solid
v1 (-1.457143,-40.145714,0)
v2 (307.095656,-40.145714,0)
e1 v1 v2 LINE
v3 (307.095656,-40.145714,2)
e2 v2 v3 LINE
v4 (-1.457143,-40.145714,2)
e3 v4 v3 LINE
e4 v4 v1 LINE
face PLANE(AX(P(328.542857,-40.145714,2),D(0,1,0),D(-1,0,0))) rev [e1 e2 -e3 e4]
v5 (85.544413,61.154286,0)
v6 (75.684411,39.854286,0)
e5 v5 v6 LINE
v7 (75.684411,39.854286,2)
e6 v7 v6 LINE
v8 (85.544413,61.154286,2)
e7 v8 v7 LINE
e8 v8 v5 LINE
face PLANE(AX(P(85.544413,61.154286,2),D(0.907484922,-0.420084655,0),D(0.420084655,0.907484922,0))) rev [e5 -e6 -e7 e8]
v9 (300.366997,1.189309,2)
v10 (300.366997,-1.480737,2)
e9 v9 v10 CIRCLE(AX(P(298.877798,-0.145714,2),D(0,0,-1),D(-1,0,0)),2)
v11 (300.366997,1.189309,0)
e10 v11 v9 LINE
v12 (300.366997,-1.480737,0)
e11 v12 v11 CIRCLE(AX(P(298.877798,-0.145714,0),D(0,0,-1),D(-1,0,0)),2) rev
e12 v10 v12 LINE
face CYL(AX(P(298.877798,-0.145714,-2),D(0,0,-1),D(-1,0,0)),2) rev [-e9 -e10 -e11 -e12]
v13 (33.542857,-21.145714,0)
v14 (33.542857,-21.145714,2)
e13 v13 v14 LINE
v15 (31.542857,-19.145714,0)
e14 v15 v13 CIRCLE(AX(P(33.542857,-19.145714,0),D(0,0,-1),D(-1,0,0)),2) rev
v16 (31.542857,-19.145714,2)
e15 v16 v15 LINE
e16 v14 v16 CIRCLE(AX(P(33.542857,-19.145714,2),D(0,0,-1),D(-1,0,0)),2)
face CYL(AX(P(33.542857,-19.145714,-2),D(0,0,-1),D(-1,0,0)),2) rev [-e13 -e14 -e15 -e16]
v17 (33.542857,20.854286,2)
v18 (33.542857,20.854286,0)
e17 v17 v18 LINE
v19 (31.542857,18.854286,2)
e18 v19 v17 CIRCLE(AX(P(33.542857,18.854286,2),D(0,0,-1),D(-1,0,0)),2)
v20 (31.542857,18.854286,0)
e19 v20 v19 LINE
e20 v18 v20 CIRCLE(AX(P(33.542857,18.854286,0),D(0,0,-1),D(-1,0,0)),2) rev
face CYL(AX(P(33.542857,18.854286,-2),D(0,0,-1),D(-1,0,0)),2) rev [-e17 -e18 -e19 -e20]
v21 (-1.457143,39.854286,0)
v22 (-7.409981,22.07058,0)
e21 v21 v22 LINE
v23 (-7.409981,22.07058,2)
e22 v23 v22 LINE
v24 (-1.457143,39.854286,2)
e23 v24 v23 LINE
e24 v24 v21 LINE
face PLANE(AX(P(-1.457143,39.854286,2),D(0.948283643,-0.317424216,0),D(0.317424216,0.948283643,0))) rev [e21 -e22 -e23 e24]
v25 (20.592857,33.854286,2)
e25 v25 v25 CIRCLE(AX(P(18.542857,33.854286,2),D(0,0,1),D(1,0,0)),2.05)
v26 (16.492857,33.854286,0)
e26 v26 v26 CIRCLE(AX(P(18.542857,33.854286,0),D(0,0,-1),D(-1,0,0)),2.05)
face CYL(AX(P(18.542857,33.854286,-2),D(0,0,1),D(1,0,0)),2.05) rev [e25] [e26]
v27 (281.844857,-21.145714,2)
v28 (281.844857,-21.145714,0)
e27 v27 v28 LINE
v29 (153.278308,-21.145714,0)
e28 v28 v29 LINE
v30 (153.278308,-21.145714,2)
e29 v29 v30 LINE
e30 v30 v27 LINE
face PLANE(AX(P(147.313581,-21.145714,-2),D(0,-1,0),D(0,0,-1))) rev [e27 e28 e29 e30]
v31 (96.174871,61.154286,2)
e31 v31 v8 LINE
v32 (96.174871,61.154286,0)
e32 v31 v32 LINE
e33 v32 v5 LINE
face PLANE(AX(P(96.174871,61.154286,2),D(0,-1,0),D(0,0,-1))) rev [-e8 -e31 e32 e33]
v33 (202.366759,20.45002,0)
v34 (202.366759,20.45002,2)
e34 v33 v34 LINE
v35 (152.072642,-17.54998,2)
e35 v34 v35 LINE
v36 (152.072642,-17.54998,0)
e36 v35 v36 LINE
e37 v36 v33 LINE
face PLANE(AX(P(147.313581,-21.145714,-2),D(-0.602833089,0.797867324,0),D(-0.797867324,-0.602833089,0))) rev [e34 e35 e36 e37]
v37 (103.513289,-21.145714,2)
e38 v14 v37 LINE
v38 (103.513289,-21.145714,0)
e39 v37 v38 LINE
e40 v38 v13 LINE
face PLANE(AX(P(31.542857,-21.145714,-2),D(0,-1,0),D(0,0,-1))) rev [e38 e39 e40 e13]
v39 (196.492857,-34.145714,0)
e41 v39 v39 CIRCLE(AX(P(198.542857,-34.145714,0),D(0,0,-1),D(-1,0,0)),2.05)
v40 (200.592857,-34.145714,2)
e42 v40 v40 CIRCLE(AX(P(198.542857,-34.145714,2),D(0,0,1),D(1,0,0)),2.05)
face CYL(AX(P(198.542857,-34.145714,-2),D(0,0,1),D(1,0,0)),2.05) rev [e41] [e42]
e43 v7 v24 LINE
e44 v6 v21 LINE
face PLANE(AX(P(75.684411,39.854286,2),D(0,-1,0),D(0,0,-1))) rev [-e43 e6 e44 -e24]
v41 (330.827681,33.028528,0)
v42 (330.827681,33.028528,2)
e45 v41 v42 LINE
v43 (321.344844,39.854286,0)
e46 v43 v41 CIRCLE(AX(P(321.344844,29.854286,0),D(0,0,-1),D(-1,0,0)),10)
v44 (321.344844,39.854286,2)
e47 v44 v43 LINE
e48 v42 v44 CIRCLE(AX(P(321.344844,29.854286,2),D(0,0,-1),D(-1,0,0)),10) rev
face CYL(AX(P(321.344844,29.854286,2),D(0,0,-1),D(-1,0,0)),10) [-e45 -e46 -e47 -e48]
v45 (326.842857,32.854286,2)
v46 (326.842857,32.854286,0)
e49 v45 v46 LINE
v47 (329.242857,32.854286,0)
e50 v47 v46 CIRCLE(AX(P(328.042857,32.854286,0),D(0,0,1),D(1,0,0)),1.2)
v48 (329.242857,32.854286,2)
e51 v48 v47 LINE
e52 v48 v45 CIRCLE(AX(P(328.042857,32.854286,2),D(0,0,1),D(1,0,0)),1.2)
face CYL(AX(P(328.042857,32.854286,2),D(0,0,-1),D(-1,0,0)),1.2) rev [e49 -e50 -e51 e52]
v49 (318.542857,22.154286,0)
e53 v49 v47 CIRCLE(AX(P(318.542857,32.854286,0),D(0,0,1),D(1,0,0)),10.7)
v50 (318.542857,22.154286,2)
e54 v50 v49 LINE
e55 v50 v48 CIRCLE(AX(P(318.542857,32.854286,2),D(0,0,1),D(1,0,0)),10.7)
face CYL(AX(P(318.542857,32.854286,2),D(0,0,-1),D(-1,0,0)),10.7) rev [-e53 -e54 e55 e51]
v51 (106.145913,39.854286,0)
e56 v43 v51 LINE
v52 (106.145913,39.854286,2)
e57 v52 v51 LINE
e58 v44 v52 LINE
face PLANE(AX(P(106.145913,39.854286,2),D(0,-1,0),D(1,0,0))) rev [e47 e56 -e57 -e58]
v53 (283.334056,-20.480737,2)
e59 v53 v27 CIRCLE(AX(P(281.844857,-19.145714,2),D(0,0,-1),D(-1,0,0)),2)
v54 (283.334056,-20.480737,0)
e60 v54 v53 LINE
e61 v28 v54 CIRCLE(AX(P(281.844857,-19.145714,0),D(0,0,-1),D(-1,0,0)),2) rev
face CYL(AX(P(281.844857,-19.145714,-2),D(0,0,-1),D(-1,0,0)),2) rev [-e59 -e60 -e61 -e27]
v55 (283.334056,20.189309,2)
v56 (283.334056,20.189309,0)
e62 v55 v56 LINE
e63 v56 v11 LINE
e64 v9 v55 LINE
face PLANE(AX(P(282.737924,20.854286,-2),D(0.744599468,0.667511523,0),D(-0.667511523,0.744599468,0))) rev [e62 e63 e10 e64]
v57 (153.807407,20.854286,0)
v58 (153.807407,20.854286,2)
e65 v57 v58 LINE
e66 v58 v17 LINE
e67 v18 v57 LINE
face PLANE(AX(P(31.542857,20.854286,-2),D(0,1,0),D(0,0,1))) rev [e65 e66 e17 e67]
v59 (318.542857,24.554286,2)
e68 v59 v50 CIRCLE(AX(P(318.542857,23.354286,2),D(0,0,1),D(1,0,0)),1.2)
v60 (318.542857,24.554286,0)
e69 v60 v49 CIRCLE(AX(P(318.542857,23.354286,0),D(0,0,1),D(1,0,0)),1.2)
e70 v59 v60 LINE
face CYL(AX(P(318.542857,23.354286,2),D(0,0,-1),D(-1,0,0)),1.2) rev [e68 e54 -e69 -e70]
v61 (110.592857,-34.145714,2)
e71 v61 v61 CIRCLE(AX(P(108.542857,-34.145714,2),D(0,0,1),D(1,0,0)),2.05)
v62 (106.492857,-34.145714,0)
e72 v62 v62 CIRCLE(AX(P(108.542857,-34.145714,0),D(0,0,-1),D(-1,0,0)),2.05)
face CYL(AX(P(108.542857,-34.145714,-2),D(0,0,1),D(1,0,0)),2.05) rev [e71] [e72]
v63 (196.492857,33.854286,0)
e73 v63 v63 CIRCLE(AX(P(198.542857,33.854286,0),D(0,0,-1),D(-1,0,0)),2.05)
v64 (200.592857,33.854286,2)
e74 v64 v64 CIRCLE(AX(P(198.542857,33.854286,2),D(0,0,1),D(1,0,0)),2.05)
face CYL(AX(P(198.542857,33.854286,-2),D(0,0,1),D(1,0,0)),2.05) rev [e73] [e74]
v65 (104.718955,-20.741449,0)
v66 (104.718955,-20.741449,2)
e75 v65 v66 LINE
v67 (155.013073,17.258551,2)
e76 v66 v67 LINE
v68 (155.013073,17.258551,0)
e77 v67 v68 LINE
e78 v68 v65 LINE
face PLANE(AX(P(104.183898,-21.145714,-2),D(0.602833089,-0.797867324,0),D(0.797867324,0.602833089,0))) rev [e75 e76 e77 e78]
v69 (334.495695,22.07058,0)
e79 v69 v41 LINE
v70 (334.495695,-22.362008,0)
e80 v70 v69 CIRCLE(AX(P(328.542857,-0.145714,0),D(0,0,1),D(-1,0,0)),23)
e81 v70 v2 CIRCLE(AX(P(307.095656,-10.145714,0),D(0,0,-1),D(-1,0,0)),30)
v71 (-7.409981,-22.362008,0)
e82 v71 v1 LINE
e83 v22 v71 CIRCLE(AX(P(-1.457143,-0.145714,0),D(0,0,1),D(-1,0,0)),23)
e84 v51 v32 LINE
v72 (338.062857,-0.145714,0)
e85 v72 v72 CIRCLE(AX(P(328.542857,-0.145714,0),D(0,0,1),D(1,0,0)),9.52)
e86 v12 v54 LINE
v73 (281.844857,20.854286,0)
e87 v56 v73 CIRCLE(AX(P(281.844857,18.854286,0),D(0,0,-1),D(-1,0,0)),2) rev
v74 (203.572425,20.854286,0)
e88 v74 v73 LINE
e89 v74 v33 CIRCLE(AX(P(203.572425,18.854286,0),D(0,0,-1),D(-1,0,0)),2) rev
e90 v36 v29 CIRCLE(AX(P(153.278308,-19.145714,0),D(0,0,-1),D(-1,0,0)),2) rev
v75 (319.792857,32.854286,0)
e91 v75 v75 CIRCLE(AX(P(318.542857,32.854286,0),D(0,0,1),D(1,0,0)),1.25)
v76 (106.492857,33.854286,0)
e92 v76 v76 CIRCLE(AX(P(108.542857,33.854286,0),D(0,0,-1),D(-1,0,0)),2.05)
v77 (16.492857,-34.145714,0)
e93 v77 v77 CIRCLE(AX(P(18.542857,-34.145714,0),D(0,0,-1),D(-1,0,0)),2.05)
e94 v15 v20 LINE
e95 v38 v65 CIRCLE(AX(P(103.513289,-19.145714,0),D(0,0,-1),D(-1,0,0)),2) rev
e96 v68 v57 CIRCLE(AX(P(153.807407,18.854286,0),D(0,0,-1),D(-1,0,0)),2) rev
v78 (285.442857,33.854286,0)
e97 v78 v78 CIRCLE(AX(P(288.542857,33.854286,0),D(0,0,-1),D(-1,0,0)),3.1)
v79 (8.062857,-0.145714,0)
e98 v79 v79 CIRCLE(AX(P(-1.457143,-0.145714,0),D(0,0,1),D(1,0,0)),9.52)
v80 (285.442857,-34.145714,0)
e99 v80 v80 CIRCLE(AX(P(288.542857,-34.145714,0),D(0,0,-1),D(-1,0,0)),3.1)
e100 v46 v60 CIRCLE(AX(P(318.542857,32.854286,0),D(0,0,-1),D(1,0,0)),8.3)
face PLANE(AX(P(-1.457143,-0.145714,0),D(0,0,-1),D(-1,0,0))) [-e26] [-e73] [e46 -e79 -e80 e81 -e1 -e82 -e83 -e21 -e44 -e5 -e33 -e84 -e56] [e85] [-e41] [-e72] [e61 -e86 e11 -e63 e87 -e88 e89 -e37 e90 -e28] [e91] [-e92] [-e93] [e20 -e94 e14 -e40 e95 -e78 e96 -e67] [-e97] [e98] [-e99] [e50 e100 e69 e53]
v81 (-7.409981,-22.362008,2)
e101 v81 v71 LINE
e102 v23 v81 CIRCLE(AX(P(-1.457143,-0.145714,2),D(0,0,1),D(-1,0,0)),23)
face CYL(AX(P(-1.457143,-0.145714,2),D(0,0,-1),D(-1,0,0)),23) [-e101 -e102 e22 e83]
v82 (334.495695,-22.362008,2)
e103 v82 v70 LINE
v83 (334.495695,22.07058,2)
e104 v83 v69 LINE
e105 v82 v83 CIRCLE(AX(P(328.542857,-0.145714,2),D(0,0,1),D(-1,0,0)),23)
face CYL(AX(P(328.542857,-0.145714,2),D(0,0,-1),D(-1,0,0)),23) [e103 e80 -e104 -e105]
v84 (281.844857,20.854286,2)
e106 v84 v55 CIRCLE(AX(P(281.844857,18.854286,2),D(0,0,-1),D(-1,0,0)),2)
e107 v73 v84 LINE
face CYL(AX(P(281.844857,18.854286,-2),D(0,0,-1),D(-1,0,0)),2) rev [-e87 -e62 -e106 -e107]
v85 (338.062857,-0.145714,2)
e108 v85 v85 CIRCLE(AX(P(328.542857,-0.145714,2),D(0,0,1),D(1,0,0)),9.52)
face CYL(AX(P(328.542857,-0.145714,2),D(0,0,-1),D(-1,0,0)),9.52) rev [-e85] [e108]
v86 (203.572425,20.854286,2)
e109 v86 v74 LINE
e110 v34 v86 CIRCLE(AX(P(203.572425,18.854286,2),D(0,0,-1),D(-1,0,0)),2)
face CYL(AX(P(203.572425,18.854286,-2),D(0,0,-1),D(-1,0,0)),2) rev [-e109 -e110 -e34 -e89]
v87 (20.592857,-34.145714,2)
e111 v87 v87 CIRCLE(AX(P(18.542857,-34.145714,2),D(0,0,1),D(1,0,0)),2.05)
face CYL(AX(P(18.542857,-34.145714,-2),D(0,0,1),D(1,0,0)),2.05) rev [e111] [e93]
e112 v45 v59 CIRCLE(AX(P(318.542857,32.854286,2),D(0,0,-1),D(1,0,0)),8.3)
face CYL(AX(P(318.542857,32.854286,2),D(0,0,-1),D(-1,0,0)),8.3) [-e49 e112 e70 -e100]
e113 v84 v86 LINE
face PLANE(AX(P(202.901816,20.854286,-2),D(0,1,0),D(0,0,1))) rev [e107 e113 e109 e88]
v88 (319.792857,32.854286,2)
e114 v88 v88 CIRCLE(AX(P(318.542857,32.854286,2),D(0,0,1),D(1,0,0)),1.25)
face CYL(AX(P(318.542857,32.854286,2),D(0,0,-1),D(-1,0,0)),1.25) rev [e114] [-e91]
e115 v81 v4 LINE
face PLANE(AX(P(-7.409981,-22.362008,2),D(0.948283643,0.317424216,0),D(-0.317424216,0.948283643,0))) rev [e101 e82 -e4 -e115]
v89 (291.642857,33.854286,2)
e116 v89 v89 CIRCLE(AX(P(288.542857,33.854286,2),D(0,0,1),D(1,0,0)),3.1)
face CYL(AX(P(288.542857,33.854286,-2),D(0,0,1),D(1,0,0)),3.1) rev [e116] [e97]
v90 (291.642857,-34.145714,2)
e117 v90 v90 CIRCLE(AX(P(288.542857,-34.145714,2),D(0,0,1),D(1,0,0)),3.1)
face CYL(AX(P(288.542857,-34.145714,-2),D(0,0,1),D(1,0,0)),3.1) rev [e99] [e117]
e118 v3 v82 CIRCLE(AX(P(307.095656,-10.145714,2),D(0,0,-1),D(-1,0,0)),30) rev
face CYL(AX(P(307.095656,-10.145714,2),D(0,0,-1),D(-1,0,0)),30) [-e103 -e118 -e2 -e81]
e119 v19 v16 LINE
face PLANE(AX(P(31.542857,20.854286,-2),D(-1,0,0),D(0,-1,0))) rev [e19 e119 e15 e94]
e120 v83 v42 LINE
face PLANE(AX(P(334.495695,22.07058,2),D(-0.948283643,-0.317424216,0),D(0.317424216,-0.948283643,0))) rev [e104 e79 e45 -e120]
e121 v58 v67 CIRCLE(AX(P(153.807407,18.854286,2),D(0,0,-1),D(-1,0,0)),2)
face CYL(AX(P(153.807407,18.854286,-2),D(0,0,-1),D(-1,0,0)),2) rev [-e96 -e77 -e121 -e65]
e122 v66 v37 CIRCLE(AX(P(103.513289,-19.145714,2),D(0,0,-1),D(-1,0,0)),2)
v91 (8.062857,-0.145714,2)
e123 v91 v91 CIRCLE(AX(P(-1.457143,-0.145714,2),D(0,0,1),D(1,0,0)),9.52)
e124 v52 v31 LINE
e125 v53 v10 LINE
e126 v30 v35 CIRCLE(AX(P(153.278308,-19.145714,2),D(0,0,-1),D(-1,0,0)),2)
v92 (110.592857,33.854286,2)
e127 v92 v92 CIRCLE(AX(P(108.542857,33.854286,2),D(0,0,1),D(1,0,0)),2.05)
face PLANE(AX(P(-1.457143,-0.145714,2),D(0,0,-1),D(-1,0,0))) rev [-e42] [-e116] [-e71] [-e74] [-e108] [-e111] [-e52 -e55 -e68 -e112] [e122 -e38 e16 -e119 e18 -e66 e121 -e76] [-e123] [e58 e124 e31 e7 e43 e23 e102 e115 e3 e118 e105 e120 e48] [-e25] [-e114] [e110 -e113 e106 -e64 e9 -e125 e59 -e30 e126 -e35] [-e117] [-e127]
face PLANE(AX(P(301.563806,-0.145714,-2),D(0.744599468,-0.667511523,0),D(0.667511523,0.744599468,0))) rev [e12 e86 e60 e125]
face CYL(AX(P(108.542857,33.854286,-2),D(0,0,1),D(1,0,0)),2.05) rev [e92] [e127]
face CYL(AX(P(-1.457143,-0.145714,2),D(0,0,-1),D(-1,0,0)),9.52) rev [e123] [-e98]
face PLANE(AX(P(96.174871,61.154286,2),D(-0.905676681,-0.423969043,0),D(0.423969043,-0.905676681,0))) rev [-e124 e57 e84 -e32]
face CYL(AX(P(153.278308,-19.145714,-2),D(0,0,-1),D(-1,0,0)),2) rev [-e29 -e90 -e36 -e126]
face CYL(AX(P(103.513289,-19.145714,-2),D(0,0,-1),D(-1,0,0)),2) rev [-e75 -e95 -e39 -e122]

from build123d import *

# Parameters (mm, degrees)
SKETCH_1_R          = 9.52
SKETCH_1_R_2        = 1.25
EXTRUDE_1_DEPTH     = 2
SKETCH_2_R          = 2.05
SKETCH_2_R_2        = 3.1
CUT_EXTRUDE_1_DEPTH = 4
FILLET_1_R          = 2
FILLET_3_R          = 30
FILLET_6_R          = 10


with BuildPart() as part:
    # 草图1 → 凸台-拉伸1 (new body)
    with BuildSketch(Plane.XY):
        with BuildLine():
            Line((328.542857143, -40.145714286), (-1.457142857, -40.145714286))
            Line((-1.457142857, -40.145714286), (-7.409980895, -22.36200829))
            ThreePointArc((-7.409980895, -22.36200829), (-24.457142857, -0.145714286), (-7.409980895, 22.070579719))
            Line((-7.409980895, 22.070579719), (-1.457142857, 39.854285714))
            Line((-1.457142857, 39.854285714), (75.684411109, 39.854285714))
            Line((75.684411109, 39.854285714), (85.544413109, 61.154285714))
            Line((85.544413109, 61.154285714), (96.174870529, 61.154285714))
            Line((96.174870529, 61.154285714), (106.145912956, 39.854285714))
            Line((106.145912956, 39.854285714), (321.071621128, 39.854285714))
            Line((321.071621128, 39.854285714), (328.542857143, 39.854285714))
            Line((328.542857143, 39.854285714), (334.49569518, 22.070579719))
            ThreePointArc((334.49569518, 22.070579719), (351.542857143, -0.145714286), (334.49569518, -22.36200829))
            Line((334.49569518, -22.36200829), (328.542857143, -40.145714286))
        make_face()
        with Locations((-1.457142857, -0.145714286)):
            Circle(SKETCH_1_R, mode=Mode.SUBTRACT)
        with Locations((328.542857143, -0.145714286)):
            Circle(SKETCH_1_R, mode=Mode.SUBTRACT)
        with Locations((318.542857143, 32.854285714)):
            Circle(SKETCH_1_R_2, mode=Mode.SUBTRACT)
        with BuildLine():
            ThreePointArc((318.542857143, 22.154285714), (326.108899702, 25.288243156), (329.242857143, 32.854285714))
            ThreePointArc((329.242857143, 32.854285714), (328.042857143, 34.054285714), (326.842857143, 32.854285714))
            ThreePointArc((326.842857143, 32.854285714), (324.411843427, 26.98529943), (318.542857143, 24.554285714))
            ThreePointArc((318.542857143, 24.554285714), (317.342857143, 23.354285714), (318.542857143, 22.154285714))
        make_face(mode=Mode.SUBTRACT)
    extrude(amount=EXTRUDE_1_DEPTH)

    # 草图2 → 切除-拉伸1 (cut)
    with BuildSketch(Plane.XY.offset(2)):
        with Locations((108.542857143, 33.854285714)):
            Circle(SKETCH_2_R)
        with Locations((198.542857143, 33.854285714)):
            Circle(SKETCH_2_R)
        with Locations((108.542857143, -34.145714286)):
            Circle(SKETCH_2_R)
        with Locations((198.542857143, -34.145714286)):
            Circle(SKETCH_2_R)
        with Locations((18.542857143, -34.145714286)):
            Circle(SKETCH_2_R)
        with Locations((18.542857143, 33.854285714)):
            Circle(SKETCH_2_R)
        with Locations((288.542857143, 33.854285714)):
            Circle(SKETCH_2_R_2)
        with Locations((288.542857143, -34.145714286)):
            Circle(SKETCH_2_R_2)
        Polygon((31.542857143, -21.145714286), (104.183898028, -21.145714286), (159.772133322, 20.854285714), (31.542857143, 20.854285714), align=None)
        Polygon((147.313580964, -21.145714286), (202.901816258, 20.854285714), (282.737923896, 20.854285714), (301.563806249, -0.145714286), (282.737923896, -21.145714286), align=None)
    extrude(amount=-CUT_EXTRUDE_1_DEPTH, mode=Mode.SUBTRACT)

    # 圆角1
    fillet_1_edges = [part.edges().sort_by_distance(p)[0] for p in [
        (282.737923896, -21.145714286, 1),
        (147.313580964, -21.145714286, 1),
        (202.901816258, 20.854285714, 1),
        (282.737923896, 20.854285714, 1),
        (301.563806249, -0.145714286, 1),
        (31.542857143, -21.145714286, 1),
        (31.542857143, 20.854285714, 1),
        (159.772133322, 20.854285714, 1),
        (104.183898028, -21.145714286, 1),
    ]]
    fillet(fillet_1_edges, radius=FILLET_1_R)

    # 圆角3
    # the kernel refuses this fillet: 30 mm, written as the material it takes off along each edge
    with BuildSketch(Plane(origin=(328.542857143, -40.145714286, -53.618003483), x_dir=(0.3174242162824087, 0.9482836426499714, 0), z_dir=(0, 0, 1))) as fillet_3_piece_1:
        with BuildLine():
            CenterArc((21.640648186, 29.86075675), FILLET_3_R, 198.507223716, 65.970321092)
            Line((-6.807861094, 20.338030262), (-7.376831279, 20.147575732))
            Line((-7.376831279, 20.147575732), (-0.568970186, -0.19045453))
            Line((-0.568970186, -0.19045453), (0, -0.6))
            ThreePointArc((0, -0.6), (9.376786225, -0.6), (18.695830935, -0.597215135))
            Line((18.695830935, -0.597215135), (18.75357245, 0))
        make_face()
    extrude(amount=109.236006966, mode=Mode.SUBTRACT)

    # 圆角6
    fillet_6_edges = [part.edges().sort_by_distance(p)[0] for p in [
        (328.542857143, 39.854285714, 1),
    ]]
    fillet(fillet_6_edges, radius=FILLET_6_R)


solid = part.part
